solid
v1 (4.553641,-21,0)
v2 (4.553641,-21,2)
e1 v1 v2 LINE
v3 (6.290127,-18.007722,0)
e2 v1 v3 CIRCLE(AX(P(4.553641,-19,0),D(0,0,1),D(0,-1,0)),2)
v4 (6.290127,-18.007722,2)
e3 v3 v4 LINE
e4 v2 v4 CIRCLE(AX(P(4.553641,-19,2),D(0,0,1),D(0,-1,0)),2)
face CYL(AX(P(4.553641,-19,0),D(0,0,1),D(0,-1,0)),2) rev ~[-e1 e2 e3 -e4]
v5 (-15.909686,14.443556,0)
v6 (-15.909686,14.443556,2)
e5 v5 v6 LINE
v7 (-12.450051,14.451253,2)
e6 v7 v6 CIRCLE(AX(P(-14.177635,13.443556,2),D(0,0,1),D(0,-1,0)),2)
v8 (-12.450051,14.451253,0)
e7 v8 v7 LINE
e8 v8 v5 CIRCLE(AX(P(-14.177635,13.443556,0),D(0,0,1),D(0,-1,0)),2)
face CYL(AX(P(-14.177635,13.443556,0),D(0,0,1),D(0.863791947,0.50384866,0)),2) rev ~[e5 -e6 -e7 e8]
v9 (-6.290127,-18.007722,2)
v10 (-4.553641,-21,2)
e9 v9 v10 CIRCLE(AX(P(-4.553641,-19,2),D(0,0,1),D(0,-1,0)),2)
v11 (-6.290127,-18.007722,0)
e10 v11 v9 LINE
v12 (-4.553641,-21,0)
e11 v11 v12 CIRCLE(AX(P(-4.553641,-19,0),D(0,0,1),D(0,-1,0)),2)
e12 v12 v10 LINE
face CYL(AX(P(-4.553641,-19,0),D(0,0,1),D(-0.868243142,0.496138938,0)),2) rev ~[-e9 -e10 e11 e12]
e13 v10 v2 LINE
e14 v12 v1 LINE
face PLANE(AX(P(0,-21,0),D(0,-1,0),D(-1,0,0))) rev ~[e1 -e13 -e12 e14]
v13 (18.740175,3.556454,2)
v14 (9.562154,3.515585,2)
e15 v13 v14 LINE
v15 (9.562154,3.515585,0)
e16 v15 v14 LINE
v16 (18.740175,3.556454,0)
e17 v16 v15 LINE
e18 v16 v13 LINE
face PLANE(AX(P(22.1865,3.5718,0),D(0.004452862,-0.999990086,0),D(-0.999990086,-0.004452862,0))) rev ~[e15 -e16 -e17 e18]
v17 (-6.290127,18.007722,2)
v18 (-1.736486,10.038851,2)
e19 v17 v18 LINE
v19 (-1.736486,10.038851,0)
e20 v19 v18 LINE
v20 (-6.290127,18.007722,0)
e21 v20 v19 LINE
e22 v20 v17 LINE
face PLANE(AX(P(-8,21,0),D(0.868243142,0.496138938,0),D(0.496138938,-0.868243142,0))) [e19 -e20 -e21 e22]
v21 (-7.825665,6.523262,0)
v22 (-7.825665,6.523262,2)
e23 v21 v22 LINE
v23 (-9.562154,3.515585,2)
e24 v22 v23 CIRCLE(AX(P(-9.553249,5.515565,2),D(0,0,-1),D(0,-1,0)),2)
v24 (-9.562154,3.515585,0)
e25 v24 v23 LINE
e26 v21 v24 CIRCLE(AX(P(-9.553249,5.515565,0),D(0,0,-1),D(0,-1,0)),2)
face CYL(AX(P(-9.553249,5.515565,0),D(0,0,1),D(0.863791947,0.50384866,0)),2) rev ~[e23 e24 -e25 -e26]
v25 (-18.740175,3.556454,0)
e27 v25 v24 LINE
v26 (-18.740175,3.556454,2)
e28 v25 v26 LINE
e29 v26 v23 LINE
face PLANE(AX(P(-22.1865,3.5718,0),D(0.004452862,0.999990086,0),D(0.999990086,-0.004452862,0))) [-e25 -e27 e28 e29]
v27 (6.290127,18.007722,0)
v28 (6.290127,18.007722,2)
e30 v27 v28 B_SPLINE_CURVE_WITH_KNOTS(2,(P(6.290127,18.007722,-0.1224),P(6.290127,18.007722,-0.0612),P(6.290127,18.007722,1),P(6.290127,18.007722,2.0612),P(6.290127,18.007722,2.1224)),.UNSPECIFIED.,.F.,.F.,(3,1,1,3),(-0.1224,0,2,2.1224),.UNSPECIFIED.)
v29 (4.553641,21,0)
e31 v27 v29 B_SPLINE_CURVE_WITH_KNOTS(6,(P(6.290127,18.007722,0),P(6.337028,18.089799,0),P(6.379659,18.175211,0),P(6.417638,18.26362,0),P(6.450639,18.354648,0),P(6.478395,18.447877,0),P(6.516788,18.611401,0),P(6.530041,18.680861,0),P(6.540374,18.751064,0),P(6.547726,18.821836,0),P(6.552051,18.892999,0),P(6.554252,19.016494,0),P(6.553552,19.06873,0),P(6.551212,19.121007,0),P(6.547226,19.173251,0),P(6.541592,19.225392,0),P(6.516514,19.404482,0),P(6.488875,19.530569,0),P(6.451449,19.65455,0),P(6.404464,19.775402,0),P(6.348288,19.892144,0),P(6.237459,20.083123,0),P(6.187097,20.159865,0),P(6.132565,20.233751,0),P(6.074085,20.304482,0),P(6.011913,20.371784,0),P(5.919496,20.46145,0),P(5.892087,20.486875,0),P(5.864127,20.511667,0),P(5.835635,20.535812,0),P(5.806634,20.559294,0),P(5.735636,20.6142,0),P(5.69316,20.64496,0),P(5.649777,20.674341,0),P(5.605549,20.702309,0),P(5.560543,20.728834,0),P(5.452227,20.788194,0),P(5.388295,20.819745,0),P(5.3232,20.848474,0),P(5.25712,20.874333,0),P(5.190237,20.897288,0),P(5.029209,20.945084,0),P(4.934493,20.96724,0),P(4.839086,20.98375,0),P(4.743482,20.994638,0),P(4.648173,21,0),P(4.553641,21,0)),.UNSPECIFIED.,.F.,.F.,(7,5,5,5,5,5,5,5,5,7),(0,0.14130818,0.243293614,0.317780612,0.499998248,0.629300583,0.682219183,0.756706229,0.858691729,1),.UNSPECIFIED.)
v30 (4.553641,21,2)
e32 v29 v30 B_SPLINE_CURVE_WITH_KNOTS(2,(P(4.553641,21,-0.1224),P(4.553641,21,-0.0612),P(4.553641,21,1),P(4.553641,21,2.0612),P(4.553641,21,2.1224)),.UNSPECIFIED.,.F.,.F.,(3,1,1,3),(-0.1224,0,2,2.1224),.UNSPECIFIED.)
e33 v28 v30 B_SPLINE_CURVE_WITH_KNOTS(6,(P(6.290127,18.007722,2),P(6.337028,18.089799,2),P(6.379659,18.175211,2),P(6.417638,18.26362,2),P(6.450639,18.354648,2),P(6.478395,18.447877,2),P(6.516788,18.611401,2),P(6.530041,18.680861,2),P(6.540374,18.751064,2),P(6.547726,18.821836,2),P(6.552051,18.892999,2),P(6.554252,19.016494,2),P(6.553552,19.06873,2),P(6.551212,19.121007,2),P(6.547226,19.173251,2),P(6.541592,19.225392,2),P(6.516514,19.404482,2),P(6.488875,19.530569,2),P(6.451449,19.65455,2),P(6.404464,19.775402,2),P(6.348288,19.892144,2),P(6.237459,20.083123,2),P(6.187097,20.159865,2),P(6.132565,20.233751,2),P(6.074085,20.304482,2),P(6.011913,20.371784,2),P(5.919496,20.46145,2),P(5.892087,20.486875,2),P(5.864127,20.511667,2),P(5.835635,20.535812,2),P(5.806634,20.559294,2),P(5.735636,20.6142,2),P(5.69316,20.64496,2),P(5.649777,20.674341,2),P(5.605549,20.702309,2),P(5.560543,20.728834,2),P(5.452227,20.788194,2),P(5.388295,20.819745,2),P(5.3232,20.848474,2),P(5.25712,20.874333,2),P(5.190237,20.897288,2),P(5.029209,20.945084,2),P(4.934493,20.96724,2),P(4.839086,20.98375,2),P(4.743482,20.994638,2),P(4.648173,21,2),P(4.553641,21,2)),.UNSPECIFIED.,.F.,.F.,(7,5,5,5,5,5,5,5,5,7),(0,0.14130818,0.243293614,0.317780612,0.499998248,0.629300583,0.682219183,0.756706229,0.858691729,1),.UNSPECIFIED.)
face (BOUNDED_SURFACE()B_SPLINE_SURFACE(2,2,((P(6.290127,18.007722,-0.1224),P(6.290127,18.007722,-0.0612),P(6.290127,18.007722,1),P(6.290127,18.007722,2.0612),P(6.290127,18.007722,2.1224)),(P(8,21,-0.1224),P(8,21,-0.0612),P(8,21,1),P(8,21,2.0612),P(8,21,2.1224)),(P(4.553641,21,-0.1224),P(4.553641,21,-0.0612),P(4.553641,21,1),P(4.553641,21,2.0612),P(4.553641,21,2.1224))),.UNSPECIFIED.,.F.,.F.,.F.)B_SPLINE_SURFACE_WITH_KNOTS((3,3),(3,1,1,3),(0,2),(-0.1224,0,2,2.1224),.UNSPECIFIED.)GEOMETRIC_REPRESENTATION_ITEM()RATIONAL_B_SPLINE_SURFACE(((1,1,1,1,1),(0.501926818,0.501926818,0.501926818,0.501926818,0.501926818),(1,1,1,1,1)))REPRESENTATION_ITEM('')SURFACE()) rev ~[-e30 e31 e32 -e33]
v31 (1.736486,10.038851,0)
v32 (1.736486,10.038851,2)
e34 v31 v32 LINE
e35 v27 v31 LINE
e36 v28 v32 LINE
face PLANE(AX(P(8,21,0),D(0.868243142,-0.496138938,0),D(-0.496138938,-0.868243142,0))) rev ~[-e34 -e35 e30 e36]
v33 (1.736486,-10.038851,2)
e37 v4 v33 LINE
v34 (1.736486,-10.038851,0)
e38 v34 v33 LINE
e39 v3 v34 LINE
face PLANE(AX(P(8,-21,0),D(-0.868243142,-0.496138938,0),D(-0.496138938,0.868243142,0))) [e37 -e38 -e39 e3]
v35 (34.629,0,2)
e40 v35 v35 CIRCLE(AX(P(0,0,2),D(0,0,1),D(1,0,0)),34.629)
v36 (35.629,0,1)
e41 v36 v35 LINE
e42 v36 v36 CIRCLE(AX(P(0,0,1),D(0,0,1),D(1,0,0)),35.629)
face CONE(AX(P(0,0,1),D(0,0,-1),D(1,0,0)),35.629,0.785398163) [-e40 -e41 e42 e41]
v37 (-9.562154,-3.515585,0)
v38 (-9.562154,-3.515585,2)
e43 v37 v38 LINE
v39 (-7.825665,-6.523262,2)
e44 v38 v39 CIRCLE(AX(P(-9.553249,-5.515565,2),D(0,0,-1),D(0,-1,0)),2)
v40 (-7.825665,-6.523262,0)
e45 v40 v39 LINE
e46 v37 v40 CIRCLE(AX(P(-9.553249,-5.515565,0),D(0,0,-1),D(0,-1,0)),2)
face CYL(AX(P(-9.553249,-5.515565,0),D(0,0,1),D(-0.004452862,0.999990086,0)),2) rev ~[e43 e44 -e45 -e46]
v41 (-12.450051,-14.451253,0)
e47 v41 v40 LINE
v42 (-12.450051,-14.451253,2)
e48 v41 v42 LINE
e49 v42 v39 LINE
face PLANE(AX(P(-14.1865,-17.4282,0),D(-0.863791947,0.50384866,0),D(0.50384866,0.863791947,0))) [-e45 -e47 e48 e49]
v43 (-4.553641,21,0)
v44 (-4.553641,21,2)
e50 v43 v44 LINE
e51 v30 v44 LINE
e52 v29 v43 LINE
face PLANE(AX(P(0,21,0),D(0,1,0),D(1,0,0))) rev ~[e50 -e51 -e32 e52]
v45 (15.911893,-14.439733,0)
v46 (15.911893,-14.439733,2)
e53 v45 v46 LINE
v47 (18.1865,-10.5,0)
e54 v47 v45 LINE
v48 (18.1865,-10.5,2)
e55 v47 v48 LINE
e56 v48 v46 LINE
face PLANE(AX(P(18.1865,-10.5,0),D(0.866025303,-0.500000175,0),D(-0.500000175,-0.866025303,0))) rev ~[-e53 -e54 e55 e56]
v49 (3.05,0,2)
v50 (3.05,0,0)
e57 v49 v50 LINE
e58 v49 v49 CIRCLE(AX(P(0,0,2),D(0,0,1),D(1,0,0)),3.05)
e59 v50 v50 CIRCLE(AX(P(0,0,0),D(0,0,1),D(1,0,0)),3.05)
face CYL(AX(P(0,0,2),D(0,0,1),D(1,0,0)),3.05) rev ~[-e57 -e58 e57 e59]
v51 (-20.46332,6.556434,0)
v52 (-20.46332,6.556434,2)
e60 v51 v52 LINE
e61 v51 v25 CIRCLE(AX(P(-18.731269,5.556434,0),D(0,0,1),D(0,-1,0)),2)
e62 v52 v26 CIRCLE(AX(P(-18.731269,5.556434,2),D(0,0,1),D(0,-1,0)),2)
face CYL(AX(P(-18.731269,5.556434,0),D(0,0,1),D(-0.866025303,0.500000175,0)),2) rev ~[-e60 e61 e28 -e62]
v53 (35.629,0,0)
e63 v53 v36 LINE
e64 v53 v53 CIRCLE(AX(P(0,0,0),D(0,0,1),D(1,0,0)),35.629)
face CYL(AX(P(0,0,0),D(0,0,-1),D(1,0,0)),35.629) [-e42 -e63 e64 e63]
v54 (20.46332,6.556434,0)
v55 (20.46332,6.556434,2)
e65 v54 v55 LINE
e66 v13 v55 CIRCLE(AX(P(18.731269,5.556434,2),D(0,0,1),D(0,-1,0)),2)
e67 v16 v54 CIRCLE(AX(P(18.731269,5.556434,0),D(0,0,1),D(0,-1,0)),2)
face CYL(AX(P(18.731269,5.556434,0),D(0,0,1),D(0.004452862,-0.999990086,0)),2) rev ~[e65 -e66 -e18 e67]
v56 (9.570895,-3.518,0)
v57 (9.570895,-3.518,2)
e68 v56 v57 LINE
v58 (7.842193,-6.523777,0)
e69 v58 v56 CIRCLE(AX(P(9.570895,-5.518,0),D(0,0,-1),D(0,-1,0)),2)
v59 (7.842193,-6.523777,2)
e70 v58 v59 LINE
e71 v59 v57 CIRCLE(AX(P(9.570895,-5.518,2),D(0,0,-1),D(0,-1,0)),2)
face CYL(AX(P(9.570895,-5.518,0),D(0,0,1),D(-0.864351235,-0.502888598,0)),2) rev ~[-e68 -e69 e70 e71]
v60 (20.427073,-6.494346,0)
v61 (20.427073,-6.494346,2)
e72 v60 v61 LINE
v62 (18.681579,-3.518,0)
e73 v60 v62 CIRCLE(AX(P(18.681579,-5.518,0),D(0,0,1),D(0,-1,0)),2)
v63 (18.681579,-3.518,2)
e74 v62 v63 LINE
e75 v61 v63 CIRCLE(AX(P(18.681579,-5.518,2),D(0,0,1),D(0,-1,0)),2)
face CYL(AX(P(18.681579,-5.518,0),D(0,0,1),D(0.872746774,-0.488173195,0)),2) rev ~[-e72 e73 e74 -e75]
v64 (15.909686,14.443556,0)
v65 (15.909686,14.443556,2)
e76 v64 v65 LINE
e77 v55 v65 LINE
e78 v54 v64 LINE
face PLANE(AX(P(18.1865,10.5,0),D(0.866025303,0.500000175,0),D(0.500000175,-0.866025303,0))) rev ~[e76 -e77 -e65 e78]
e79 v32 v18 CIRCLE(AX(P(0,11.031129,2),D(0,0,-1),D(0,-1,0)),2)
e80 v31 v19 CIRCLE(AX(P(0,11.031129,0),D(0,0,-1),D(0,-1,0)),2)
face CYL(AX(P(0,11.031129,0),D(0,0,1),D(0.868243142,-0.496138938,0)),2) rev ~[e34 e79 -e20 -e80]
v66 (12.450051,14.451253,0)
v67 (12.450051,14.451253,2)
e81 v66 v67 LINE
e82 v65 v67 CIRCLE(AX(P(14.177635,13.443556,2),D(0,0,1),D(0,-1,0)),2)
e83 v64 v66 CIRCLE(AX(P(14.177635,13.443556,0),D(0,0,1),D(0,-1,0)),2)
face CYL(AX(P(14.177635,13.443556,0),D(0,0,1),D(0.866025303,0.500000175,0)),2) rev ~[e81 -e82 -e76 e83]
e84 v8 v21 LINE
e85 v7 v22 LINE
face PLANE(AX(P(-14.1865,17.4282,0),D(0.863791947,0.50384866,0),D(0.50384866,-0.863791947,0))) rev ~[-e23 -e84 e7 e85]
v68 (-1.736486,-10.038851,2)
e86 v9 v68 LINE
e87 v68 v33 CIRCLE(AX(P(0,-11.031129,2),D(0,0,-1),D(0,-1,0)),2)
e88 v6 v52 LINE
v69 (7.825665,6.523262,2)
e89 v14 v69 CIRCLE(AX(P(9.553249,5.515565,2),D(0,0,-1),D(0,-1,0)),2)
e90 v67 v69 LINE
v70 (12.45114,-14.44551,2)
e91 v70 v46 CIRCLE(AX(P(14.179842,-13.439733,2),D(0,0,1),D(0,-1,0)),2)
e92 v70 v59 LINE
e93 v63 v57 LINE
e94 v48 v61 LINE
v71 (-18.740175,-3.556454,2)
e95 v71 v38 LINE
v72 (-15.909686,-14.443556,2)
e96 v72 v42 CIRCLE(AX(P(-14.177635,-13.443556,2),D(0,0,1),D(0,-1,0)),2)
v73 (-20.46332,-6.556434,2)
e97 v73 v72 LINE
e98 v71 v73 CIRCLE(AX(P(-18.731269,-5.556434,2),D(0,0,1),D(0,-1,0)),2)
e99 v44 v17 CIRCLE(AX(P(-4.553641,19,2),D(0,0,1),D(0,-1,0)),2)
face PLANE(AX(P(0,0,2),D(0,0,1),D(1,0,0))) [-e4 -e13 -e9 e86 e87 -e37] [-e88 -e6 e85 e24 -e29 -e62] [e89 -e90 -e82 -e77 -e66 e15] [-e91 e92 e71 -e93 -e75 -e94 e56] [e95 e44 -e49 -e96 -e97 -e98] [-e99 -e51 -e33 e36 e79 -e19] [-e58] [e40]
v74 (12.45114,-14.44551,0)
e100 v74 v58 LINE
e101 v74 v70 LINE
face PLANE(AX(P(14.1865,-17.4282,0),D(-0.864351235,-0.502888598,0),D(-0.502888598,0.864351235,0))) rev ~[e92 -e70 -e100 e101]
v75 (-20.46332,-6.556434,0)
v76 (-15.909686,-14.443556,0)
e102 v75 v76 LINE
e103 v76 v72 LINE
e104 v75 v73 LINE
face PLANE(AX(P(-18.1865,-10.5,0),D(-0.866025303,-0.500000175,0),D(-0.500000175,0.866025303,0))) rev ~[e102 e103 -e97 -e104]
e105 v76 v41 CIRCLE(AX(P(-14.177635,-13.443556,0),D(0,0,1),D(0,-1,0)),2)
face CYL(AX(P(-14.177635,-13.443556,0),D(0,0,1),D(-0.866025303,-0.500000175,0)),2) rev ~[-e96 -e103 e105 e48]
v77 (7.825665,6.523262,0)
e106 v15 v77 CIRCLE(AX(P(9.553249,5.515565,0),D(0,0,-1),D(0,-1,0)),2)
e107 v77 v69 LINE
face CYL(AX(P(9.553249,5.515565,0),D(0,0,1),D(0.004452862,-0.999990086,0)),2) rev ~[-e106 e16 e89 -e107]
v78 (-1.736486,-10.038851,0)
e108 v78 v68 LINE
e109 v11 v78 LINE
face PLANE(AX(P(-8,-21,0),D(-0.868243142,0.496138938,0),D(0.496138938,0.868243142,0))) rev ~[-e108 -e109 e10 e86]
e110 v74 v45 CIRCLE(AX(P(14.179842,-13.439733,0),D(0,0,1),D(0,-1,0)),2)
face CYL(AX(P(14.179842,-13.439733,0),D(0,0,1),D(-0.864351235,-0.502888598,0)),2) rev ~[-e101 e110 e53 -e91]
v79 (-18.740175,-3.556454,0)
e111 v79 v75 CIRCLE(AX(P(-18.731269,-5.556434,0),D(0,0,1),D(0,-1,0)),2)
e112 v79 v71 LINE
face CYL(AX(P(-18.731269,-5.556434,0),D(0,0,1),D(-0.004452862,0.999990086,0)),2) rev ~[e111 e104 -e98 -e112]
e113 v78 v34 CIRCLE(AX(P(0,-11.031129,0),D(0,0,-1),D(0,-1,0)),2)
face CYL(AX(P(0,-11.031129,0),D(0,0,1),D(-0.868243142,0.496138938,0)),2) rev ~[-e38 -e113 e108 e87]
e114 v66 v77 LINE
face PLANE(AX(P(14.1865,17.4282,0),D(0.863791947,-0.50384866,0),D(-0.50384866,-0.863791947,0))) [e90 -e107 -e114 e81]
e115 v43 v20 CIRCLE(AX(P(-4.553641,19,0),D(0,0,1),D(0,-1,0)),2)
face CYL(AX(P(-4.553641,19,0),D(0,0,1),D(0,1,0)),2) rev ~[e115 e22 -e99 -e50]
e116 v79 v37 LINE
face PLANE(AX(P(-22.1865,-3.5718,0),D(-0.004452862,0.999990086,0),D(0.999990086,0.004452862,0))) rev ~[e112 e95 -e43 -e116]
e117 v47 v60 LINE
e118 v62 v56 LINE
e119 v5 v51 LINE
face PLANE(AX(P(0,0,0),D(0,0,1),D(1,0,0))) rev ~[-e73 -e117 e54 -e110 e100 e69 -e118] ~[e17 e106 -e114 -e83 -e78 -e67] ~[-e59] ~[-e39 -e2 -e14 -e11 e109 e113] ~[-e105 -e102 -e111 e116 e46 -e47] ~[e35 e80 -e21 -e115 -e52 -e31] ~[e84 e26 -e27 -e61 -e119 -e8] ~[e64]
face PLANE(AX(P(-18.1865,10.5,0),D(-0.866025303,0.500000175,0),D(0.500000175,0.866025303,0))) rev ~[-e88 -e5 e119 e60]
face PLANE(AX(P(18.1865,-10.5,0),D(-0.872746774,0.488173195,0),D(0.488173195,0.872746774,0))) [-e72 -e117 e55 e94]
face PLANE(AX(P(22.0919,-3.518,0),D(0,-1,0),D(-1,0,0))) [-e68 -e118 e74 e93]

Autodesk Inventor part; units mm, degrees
sketch "Sketch1" plane through (0, 0, 0) normal (0, 0, 1) x (1, 0, 0)
  line L0 (0, 2.8582) -> (0, -2.8582) construction
  line L1 (-5.7775, 0) -> (5.7775, 0) construction
  circle A0 centre (0, 0) radius 35.629
  circle A1 centre (0, 0) radius 4
  line L2 (0, 4) -> (0, 7)
  line L3 (0, 7) -> (0, 21)
  line L4 (0, 21) -> (5, 21)
  line L5 (5, 21) -> (8, 21)
  line L6 (8, 21) -> (0, 7)
  line L7 (0, 21) -> (-8, 21)
  line L8 (-8, 21) -> (0, 7)
  line L9 (0, -4) -> (0, -7)
  line L10 (0, -7) -> (0, -21)
  line L11 (0, -21) -> (8, -21)
  line L12 (8, -21) -> (0, -7)
  line L13 (0, -21) -> (-8, -21)
  line L14 (-8, -21) -> (0, -7)
  line L15 (0, 0) -> (2.5981, 1.5)
  line L16 (0, 0) -> (3, 0) construction
  line L17 (2.5981, 1.5) -> (3.4641, 2)
  line L18 (3.4641, 2) -> (6.0622, 3.5)
  line L19 (6.0622, 3.5) -> (18.1865, 10.5)
  line L20 (18.1865, 10.5) -> (14.1865, 17.4282)
  line L21 (14.1865, 17.4282) -> (6.0622, 3.5)
  line L22 (18.1865, 10.5) -> (22.1865, 3.5718)
  line L23 (22.1865, 3.5718) -> (6.0622, 3.5)
  line L24 (0, 0) -> (8, 0) construction
  line L25 (0, 0) -> (3.4641, -2)
  line L26 (0, 0) -> (4, 0) construction
  line L27 (3.4641, -2) -> (6.0622, -3.5)
  line L28 (6.0622, -3.5) -> (18.1865, -10.5)
  line L29 (18.1865, -10.5) -> (14.1865, -17.4282)
  line L30 (14.1865, -17.4282) -> (6.0934, -3.518)
  line L31 (18.1865, -10.5) -> (22.0919, -3.518)
  line L32 (22.0919, -3.518) -> (6.0934, -3.518)
  line L33 (0, 0) -> (-2.5981, 1.5)
  line L34 (0, 0) -> (3, 0) construction
  line L35 (-2.5981, 1.5) -> (-3.4641, 2)
  line L36 (-3.4641, 2) -> (-6.0622, 3.5)
  line L37 (-6.0622, 3.5) -> (-18.1865, 10.5)
  line L38 (-18.1865, 10.5) -> (-14.1865, 17.4282)
  line L39 (-14.1865, 17.4282) -> (-6.0622, 3.5)
  line L40 (-18.1865, 10.5) -> (-22.1865, 3.5718)
  line L41 (-22.1865, 3.5718) -> (-6.0622, 3.5)
  line L42 (0, 0) -> (-6.0622, -3.5)
  line L43 (0, 0) -> (7, 0) construction
  line L44 (-6.0622, -3.5) -> (-18.1865, -10.5)
  line L45 (-18.1865, -10.5) -> (-14.1865, -17.4282)
  line L46 (-14.1865, -17.4282) -> (-6.0622, -3.5)
  line L47 (-18.1865, -10.5) -> (-22.1865, -3.5718)
  line L48 (-22.1865, -3.5718) -> (-6.0622, -3.5)
  dimension "d0" = 71.258
  dimension "d1" = 8
  dimension "d2" = 3
  dimension "d3" = 14
  dimension "d4" = 5
  dimension "d5" = 3
  dimension "d6" = 8
  dimension "d7" = 3
  dimension "d8" = 14
  dimension "d9" = 8
  dimension "d10" = 8
  dimension "d11" = 3
  dimension "d12" = 30
  dimension "d13" = 3
  dimension "d14" = 14
  dimension "d15" = 8
  dimension "d16" = 8
  dimension "d19" = 4
  dimension "d20" = 30
  dimension "d21" = 3
  dimension "d22" = 14
  dimension "d23" = 8
  dimension "d24" = 8
  dimension "d25" = 3
  dimension "d26" = 150
  dimension "d27" = 1
  dimension "d28" = 180
  dimension "d29" = 3
  dimension "d30" = 180
  dimension "d31" = 180
  dimension "d32" = 8
  dimension "d33" = 8
  dimension "d34" = 7
  dimension "d35" = 150
  dimension "d36" = 14
  dimension "d37" = 180
  dimension "d38" = 8
  dimension "d39" = 8
extrude "Extrusion1" add sketch "Sketch1" along normal blind 2
fillet "Fillet1" radius 2 18 edges at (14.1865, 17.4282, 1) (22.1865, 3.5718, 1) (6.0622, 3.5, 1) (22.0919, -3.518, 1) (14.1865, -17.4282, 1) (6.0934, -3.518, 1) (0, 7, 1) (-8, 21, 1) (8, 21, 1) (-6.0622, 3.5, 1) (-22.1865, 3.5718, 1) (-14.1865, 17.4282, 1) (-6.0622, -3.5, 1) (-14.1865, -17.4282, 1) (-22.1865, -3.5718, 1) (-8, -21, 1) (0, -7, 1) (8, -21, 1)
sketch "Sketch2" plane through (0, 0, 2) normal (0, 0, 1) x (1, 0, 0)
  circle A0 centre (0, 0) radius 3.05
  circle A1 centre (0, 0) radius 5
  dimension "d43" = 6.1
  dimension "d49" = 10
extrude "Extrusion2" add sketch "Sketch2" against normal blind 2
chamfer "Chamfer1" distance 1 angle 45 1 edges at (-35.629, 0, 2)
properties part number "Wiel hout x 20mm" material "S235"
